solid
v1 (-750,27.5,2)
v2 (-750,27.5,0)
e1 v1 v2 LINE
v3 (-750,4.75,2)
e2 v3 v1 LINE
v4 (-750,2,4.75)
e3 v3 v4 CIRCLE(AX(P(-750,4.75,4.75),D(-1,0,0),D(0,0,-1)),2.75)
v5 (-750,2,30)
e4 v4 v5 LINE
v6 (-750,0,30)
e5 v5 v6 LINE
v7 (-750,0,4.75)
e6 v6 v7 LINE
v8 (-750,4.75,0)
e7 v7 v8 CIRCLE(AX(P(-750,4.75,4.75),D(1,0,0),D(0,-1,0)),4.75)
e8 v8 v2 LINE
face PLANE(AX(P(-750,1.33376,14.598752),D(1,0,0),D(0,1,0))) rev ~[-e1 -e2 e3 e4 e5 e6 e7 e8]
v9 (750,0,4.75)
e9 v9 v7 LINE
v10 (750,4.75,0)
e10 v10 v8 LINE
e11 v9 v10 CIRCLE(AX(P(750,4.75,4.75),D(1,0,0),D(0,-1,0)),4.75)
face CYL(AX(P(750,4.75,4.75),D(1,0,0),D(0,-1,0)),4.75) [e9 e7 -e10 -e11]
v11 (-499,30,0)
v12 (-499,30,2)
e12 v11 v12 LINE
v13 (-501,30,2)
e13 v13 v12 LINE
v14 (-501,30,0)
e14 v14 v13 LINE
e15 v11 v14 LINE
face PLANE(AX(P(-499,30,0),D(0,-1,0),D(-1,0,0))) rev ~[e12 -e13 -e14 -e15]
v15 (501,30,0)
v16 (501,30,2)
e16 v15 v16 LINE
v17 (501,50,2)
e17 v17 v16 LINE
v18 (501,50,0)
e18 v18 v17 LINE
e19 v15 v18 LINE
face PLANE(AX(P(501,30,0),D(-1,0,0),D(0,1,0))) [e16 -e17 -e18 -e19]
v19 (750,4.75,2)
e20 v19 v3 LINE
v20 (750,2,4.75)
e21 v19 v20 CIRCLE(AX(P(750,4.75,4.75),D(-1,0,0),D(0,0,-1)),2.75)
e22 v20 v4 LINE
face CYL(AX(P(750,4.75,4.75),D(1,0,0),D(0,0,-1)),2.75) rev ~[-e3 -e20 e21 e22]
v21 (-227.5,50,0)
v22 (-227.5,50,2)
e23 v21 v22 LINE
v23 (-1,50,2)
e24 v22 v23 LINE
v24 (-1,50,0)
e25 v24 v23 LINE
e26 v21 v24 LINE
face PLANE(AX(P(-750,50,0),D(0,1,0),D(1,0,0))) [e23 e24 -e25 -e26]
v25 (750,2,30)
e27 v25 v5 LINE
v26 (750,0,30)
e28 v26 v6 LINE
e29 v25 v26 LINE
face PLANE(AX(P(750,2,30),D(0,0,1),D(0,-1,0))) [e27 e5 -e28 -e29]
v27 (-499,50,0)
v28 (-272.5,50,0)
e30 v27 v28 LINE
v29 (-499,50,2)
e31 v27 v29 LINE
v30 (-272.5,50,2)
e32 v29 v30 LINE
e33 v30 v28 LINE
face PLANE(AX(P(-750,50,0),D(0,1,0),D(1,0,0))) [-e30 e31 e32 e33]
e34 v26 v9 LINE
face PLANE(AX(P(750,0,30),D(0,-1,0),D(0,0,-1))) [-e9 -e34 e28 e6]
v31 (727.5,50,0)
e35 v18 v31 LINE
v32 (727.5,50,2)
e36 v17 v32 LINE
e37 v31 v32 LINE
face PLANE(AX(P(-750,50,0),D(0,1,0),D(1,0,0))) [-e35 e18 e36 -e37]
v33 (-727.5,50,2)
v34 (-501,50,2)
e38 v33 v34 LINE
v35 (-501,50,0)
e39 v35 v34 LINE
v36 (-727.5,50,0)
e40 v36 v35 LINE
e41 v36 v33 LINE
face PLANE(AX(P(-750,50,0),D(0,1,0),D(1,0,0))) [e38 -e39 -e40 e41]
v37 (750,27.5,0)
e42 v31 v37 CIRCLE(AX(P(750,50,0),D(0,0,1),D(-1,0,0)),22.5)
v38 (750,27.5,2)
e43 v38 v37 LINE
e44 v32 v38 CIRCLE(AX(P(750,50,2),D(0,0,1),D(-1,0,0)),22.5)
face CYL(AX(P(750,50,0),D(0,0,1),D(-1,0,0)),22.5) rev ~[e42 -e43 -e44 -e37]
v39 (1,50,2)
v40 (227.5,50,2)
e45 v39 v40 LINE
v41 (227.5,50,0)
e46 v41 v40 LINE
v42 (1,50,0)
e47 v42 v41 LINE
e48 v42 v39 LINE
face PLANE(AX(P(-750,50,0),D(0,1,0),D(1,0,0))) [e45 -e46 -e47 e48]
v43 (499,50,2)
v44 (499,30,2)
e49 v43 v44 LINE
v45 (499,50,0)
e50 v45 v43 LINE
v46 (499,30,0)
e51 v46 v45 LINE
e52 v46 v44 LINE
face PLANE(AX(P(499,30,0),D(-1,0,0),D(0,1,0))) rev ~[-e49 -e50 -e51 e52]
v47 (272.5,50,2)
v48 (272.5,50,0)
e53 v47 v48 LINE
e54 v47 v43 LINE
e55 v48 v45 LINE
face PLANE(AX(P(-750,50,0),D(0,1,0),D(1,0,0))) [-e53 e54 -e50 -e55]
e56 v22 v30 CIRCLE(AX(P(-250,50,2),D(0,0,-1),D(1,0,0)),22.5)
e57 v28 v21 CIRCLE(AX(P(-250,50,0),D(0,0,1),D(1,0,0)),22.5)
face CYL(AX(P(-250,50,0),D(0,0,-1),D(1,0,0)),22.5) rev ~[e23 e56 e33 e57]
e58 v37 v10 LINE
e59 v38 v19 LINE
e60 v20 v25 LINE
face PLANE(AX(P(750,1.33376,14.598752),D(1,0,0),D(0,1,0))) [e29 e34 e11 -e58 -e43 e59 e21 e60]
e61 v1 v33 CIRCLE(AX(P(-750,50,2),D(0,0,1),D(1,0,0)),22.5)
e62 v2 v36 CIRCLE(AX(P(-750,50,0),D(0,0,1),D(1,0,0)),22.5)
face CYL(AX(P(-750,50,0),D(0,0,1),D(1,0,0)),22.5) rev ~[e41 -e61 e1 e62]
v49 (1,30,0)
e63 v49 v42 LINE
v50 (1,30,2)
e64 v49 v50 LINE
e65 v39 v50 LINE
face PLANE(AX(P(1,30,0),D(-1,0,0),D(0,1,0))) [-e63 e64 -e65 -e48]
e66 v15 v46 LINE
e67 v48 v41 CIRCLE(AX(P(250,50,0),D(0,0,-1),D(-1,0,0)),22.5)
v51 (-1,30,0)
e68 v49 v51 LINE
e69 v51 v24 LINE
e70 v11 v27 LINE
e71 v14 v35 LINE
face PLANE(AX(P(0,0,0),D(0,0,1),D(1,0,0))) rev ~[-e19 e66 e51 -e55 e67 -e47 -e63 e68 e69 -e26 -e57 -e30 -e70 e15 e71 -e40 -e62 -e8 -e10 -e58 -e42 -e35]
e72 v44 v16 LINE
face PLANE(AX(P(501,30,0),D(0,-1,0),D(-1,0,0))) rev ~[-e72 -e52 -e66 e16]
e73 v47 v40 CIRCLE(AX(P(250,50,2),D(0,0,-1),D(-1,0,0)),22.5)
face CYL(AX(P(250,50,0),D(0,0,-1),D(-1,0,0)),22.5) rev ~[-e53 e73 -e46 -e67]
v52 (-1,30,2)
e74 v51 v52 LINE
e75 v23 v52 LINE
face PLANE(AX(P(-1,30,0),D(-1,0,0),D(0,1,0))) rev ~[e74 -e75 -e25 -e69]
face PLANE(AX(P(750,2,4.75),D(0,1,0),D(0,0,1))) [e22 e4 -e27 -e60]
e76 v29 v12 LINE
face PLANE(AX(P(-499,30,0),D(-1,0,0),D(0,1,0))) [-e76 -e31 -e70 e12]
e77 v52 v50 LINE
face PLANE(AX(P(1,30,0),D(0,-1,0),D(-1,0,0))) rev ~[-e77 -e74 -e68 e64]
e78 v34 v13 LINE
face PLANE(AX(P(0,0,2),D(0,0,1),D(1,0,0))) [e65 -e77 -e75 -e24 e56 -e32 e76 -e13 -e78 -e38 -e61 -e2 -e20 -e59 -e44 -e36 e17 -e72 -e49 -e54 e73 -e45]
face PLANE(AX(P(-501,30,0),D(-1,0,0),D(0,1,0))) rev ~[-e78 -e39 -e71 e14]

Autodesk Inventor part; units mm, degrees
ref_plane "YZ Plane" through (0, 0, 0) normal (1, 0, 0) x (0, 1, 0)
ref_plane "XZ Plane" through (0, 0, 0) normal (0, 1, 0) x (-1, 0, 0)
ref_plane "XY Plane" through (0, 0, 0) normal (0, 0, 1) x (1, 0, 0)
sketch "Sketch1" plane through (0, 0, 0) normal (0, 0, 1) x (1, 0, 0)
  line L0 (-750, 50) -> (750, 50)
  line L1 (750, 50) -> (750, 0)
  line L2 (750, 0) -> (-750, 0)
  line L3 (-750, 0) -> (-750, 50)
  point P0 (0, 0)
  point P1 (0, 0)
  dimension "d0" = 1500
  dimension "d1" = 50
extrude "Plate1" add sketch "Sketch1" along normal blind 2
sketch "Sketch2" plane through (750, 2, 0) normal (0, -1, 0) x (1, 0, 0)
  line L0 (-1500, 0) -> (0, 0)
  line L1 (0, 0) -> (0, 30)
  line L2 (0, 30) -> (-1500, 30)
  line L3 (-1500, 30) -> (-1500, 0)
edge flange "Flange1" height 30 angle 90 thickness 2 bend radius 2.75 thickness toward (0, -1, 0) relief round relief width 2 relief depth 1 edges at (0, 0, 2) wall of the first edge with corners at (-750, 2, 0) (750, 2, 0) (750, 2, 30) (-750, 2, 30)
bend "Bend1"
corner "Corner1"
sketch "Sketch5" plane through (0, 0, 0) normal (0, 0, -1) x (-1, 0, 0)
  line L0 (750, 50) -> (-750, 50) projected
  line L1 (-1, 30) -> (-1, 50)
  line L2 (750, 0) -> (-750, 0) projected
  line L3 (-1, 30) -> (1, 30)
  line L4 (1, 30) -> (1, 50)
  point P0 (0, 0)
  point P1 (0, 30)
  point P2 (0, 0)
  dimension "d27" = 2
  dimension "d28" = 30
extrude "Extrusion1" cut sketch "Sketch5" against normal through all
pattern_linear "Rectangular Pattern1" count 3 spacing 500 along (1, 0, 0) of "Extrusion1" first direction both ways yes
sketch "Sketch6" plane through (0, 0, 0) normal (0, 0, -1) x (-1, 0, 0)
  line L0 (-750, 50) -> (-750, 4.75) projected
  circle A0 centre (-750, 50) radius 22.5
  line L1 (-750, 50) -> (750, 50) projected
  line L2 (-1, 50) -> (-1, 30) projected
  line L3 (-499, 50) -> (-499, 30) projected
  line L4 (-1, 30) -> (-499, 30) construction
  circle A1 centre (-250, 50) radius 22.5
  point P0 (0, 0)
  point P1 (-727.5, 50)
  point P2 (-750, 27.5)
  point P3 (-250, 30)
  dimension "d24" = 45
extrude "Extrusion2" cut sketch "Sketch6" along normal mid plane 30 contours L1 A0 L0 | A1 L1 | L1 A1 picked at (-748.3311, 35.188)
mirror "Mirror1" about plane through (0, 0, 0) normal (1, 0, 0) of "Extrusion2"
sketch "Sketch7" plane through (0, 0, 2) normal (0, 0, 1) x (1, 0, 0)
  line L0 (494, 45) -> (494, 33) construction
  line L1 (494, 33) -> (294, 33) construction
  line L2 (294, 33) -> (294, 45) construction
  line L3 (294, 45) -> (494, 45) construction
  line L4 (272.5, 50) -> (499, 50) projected
  point P0 (0, 0)
  dimension "d29" = 200
  dimension "d30" = 12
  dimension "d31" = 5
  dimension "d32" = 5
mark "Mark1"
equation "\"d28\" = Стрингер_глубина_паза"
equation "\"d1\" = Стрингер_7"
equation "\"d27\" = d18"
equation "\"d2\" = Thickness"
equation "\"d3\" = BendReliefWidth"
equation "\"d4\" = BendReliefDepth"
equation "\"d5\" = MinimumRemnant"
equation "\"d6\" = TransitionRadius"
equation "\"d9\" = BendRadius"
equation "\"d10\" = CornerReliefSize"
equation "\"d11\" = GapSize"
equation "\"d12\" = JacobiRadiusSize"
equation "\"GapSize\" = Thickness"
equation "\"MinimumRemnant\" = 2 * Thickness"
equation "\"BendReliefDepth\" = 0.5 * Thickness"
equation "\"BendReliefWidth\" = Thickness"
equation "\"CornerReliefSize\" = 4 * Thickness"
equation "\"JacobiRadiusSize\" = BendRadius"
equation "\"TransitionRadius\" = BendRadius"
equation "\"d18\" = Thickness"
equation "\"Стрингер_7\" = 50"
equation "\"Thickness\" = 2"
equation "\"BendRadius\" = 2.75"
equation "\"Стрингер_глубина_паза\" = 30"
properties part number "MSC 057 stringer belly" material "Stainless Steel"
